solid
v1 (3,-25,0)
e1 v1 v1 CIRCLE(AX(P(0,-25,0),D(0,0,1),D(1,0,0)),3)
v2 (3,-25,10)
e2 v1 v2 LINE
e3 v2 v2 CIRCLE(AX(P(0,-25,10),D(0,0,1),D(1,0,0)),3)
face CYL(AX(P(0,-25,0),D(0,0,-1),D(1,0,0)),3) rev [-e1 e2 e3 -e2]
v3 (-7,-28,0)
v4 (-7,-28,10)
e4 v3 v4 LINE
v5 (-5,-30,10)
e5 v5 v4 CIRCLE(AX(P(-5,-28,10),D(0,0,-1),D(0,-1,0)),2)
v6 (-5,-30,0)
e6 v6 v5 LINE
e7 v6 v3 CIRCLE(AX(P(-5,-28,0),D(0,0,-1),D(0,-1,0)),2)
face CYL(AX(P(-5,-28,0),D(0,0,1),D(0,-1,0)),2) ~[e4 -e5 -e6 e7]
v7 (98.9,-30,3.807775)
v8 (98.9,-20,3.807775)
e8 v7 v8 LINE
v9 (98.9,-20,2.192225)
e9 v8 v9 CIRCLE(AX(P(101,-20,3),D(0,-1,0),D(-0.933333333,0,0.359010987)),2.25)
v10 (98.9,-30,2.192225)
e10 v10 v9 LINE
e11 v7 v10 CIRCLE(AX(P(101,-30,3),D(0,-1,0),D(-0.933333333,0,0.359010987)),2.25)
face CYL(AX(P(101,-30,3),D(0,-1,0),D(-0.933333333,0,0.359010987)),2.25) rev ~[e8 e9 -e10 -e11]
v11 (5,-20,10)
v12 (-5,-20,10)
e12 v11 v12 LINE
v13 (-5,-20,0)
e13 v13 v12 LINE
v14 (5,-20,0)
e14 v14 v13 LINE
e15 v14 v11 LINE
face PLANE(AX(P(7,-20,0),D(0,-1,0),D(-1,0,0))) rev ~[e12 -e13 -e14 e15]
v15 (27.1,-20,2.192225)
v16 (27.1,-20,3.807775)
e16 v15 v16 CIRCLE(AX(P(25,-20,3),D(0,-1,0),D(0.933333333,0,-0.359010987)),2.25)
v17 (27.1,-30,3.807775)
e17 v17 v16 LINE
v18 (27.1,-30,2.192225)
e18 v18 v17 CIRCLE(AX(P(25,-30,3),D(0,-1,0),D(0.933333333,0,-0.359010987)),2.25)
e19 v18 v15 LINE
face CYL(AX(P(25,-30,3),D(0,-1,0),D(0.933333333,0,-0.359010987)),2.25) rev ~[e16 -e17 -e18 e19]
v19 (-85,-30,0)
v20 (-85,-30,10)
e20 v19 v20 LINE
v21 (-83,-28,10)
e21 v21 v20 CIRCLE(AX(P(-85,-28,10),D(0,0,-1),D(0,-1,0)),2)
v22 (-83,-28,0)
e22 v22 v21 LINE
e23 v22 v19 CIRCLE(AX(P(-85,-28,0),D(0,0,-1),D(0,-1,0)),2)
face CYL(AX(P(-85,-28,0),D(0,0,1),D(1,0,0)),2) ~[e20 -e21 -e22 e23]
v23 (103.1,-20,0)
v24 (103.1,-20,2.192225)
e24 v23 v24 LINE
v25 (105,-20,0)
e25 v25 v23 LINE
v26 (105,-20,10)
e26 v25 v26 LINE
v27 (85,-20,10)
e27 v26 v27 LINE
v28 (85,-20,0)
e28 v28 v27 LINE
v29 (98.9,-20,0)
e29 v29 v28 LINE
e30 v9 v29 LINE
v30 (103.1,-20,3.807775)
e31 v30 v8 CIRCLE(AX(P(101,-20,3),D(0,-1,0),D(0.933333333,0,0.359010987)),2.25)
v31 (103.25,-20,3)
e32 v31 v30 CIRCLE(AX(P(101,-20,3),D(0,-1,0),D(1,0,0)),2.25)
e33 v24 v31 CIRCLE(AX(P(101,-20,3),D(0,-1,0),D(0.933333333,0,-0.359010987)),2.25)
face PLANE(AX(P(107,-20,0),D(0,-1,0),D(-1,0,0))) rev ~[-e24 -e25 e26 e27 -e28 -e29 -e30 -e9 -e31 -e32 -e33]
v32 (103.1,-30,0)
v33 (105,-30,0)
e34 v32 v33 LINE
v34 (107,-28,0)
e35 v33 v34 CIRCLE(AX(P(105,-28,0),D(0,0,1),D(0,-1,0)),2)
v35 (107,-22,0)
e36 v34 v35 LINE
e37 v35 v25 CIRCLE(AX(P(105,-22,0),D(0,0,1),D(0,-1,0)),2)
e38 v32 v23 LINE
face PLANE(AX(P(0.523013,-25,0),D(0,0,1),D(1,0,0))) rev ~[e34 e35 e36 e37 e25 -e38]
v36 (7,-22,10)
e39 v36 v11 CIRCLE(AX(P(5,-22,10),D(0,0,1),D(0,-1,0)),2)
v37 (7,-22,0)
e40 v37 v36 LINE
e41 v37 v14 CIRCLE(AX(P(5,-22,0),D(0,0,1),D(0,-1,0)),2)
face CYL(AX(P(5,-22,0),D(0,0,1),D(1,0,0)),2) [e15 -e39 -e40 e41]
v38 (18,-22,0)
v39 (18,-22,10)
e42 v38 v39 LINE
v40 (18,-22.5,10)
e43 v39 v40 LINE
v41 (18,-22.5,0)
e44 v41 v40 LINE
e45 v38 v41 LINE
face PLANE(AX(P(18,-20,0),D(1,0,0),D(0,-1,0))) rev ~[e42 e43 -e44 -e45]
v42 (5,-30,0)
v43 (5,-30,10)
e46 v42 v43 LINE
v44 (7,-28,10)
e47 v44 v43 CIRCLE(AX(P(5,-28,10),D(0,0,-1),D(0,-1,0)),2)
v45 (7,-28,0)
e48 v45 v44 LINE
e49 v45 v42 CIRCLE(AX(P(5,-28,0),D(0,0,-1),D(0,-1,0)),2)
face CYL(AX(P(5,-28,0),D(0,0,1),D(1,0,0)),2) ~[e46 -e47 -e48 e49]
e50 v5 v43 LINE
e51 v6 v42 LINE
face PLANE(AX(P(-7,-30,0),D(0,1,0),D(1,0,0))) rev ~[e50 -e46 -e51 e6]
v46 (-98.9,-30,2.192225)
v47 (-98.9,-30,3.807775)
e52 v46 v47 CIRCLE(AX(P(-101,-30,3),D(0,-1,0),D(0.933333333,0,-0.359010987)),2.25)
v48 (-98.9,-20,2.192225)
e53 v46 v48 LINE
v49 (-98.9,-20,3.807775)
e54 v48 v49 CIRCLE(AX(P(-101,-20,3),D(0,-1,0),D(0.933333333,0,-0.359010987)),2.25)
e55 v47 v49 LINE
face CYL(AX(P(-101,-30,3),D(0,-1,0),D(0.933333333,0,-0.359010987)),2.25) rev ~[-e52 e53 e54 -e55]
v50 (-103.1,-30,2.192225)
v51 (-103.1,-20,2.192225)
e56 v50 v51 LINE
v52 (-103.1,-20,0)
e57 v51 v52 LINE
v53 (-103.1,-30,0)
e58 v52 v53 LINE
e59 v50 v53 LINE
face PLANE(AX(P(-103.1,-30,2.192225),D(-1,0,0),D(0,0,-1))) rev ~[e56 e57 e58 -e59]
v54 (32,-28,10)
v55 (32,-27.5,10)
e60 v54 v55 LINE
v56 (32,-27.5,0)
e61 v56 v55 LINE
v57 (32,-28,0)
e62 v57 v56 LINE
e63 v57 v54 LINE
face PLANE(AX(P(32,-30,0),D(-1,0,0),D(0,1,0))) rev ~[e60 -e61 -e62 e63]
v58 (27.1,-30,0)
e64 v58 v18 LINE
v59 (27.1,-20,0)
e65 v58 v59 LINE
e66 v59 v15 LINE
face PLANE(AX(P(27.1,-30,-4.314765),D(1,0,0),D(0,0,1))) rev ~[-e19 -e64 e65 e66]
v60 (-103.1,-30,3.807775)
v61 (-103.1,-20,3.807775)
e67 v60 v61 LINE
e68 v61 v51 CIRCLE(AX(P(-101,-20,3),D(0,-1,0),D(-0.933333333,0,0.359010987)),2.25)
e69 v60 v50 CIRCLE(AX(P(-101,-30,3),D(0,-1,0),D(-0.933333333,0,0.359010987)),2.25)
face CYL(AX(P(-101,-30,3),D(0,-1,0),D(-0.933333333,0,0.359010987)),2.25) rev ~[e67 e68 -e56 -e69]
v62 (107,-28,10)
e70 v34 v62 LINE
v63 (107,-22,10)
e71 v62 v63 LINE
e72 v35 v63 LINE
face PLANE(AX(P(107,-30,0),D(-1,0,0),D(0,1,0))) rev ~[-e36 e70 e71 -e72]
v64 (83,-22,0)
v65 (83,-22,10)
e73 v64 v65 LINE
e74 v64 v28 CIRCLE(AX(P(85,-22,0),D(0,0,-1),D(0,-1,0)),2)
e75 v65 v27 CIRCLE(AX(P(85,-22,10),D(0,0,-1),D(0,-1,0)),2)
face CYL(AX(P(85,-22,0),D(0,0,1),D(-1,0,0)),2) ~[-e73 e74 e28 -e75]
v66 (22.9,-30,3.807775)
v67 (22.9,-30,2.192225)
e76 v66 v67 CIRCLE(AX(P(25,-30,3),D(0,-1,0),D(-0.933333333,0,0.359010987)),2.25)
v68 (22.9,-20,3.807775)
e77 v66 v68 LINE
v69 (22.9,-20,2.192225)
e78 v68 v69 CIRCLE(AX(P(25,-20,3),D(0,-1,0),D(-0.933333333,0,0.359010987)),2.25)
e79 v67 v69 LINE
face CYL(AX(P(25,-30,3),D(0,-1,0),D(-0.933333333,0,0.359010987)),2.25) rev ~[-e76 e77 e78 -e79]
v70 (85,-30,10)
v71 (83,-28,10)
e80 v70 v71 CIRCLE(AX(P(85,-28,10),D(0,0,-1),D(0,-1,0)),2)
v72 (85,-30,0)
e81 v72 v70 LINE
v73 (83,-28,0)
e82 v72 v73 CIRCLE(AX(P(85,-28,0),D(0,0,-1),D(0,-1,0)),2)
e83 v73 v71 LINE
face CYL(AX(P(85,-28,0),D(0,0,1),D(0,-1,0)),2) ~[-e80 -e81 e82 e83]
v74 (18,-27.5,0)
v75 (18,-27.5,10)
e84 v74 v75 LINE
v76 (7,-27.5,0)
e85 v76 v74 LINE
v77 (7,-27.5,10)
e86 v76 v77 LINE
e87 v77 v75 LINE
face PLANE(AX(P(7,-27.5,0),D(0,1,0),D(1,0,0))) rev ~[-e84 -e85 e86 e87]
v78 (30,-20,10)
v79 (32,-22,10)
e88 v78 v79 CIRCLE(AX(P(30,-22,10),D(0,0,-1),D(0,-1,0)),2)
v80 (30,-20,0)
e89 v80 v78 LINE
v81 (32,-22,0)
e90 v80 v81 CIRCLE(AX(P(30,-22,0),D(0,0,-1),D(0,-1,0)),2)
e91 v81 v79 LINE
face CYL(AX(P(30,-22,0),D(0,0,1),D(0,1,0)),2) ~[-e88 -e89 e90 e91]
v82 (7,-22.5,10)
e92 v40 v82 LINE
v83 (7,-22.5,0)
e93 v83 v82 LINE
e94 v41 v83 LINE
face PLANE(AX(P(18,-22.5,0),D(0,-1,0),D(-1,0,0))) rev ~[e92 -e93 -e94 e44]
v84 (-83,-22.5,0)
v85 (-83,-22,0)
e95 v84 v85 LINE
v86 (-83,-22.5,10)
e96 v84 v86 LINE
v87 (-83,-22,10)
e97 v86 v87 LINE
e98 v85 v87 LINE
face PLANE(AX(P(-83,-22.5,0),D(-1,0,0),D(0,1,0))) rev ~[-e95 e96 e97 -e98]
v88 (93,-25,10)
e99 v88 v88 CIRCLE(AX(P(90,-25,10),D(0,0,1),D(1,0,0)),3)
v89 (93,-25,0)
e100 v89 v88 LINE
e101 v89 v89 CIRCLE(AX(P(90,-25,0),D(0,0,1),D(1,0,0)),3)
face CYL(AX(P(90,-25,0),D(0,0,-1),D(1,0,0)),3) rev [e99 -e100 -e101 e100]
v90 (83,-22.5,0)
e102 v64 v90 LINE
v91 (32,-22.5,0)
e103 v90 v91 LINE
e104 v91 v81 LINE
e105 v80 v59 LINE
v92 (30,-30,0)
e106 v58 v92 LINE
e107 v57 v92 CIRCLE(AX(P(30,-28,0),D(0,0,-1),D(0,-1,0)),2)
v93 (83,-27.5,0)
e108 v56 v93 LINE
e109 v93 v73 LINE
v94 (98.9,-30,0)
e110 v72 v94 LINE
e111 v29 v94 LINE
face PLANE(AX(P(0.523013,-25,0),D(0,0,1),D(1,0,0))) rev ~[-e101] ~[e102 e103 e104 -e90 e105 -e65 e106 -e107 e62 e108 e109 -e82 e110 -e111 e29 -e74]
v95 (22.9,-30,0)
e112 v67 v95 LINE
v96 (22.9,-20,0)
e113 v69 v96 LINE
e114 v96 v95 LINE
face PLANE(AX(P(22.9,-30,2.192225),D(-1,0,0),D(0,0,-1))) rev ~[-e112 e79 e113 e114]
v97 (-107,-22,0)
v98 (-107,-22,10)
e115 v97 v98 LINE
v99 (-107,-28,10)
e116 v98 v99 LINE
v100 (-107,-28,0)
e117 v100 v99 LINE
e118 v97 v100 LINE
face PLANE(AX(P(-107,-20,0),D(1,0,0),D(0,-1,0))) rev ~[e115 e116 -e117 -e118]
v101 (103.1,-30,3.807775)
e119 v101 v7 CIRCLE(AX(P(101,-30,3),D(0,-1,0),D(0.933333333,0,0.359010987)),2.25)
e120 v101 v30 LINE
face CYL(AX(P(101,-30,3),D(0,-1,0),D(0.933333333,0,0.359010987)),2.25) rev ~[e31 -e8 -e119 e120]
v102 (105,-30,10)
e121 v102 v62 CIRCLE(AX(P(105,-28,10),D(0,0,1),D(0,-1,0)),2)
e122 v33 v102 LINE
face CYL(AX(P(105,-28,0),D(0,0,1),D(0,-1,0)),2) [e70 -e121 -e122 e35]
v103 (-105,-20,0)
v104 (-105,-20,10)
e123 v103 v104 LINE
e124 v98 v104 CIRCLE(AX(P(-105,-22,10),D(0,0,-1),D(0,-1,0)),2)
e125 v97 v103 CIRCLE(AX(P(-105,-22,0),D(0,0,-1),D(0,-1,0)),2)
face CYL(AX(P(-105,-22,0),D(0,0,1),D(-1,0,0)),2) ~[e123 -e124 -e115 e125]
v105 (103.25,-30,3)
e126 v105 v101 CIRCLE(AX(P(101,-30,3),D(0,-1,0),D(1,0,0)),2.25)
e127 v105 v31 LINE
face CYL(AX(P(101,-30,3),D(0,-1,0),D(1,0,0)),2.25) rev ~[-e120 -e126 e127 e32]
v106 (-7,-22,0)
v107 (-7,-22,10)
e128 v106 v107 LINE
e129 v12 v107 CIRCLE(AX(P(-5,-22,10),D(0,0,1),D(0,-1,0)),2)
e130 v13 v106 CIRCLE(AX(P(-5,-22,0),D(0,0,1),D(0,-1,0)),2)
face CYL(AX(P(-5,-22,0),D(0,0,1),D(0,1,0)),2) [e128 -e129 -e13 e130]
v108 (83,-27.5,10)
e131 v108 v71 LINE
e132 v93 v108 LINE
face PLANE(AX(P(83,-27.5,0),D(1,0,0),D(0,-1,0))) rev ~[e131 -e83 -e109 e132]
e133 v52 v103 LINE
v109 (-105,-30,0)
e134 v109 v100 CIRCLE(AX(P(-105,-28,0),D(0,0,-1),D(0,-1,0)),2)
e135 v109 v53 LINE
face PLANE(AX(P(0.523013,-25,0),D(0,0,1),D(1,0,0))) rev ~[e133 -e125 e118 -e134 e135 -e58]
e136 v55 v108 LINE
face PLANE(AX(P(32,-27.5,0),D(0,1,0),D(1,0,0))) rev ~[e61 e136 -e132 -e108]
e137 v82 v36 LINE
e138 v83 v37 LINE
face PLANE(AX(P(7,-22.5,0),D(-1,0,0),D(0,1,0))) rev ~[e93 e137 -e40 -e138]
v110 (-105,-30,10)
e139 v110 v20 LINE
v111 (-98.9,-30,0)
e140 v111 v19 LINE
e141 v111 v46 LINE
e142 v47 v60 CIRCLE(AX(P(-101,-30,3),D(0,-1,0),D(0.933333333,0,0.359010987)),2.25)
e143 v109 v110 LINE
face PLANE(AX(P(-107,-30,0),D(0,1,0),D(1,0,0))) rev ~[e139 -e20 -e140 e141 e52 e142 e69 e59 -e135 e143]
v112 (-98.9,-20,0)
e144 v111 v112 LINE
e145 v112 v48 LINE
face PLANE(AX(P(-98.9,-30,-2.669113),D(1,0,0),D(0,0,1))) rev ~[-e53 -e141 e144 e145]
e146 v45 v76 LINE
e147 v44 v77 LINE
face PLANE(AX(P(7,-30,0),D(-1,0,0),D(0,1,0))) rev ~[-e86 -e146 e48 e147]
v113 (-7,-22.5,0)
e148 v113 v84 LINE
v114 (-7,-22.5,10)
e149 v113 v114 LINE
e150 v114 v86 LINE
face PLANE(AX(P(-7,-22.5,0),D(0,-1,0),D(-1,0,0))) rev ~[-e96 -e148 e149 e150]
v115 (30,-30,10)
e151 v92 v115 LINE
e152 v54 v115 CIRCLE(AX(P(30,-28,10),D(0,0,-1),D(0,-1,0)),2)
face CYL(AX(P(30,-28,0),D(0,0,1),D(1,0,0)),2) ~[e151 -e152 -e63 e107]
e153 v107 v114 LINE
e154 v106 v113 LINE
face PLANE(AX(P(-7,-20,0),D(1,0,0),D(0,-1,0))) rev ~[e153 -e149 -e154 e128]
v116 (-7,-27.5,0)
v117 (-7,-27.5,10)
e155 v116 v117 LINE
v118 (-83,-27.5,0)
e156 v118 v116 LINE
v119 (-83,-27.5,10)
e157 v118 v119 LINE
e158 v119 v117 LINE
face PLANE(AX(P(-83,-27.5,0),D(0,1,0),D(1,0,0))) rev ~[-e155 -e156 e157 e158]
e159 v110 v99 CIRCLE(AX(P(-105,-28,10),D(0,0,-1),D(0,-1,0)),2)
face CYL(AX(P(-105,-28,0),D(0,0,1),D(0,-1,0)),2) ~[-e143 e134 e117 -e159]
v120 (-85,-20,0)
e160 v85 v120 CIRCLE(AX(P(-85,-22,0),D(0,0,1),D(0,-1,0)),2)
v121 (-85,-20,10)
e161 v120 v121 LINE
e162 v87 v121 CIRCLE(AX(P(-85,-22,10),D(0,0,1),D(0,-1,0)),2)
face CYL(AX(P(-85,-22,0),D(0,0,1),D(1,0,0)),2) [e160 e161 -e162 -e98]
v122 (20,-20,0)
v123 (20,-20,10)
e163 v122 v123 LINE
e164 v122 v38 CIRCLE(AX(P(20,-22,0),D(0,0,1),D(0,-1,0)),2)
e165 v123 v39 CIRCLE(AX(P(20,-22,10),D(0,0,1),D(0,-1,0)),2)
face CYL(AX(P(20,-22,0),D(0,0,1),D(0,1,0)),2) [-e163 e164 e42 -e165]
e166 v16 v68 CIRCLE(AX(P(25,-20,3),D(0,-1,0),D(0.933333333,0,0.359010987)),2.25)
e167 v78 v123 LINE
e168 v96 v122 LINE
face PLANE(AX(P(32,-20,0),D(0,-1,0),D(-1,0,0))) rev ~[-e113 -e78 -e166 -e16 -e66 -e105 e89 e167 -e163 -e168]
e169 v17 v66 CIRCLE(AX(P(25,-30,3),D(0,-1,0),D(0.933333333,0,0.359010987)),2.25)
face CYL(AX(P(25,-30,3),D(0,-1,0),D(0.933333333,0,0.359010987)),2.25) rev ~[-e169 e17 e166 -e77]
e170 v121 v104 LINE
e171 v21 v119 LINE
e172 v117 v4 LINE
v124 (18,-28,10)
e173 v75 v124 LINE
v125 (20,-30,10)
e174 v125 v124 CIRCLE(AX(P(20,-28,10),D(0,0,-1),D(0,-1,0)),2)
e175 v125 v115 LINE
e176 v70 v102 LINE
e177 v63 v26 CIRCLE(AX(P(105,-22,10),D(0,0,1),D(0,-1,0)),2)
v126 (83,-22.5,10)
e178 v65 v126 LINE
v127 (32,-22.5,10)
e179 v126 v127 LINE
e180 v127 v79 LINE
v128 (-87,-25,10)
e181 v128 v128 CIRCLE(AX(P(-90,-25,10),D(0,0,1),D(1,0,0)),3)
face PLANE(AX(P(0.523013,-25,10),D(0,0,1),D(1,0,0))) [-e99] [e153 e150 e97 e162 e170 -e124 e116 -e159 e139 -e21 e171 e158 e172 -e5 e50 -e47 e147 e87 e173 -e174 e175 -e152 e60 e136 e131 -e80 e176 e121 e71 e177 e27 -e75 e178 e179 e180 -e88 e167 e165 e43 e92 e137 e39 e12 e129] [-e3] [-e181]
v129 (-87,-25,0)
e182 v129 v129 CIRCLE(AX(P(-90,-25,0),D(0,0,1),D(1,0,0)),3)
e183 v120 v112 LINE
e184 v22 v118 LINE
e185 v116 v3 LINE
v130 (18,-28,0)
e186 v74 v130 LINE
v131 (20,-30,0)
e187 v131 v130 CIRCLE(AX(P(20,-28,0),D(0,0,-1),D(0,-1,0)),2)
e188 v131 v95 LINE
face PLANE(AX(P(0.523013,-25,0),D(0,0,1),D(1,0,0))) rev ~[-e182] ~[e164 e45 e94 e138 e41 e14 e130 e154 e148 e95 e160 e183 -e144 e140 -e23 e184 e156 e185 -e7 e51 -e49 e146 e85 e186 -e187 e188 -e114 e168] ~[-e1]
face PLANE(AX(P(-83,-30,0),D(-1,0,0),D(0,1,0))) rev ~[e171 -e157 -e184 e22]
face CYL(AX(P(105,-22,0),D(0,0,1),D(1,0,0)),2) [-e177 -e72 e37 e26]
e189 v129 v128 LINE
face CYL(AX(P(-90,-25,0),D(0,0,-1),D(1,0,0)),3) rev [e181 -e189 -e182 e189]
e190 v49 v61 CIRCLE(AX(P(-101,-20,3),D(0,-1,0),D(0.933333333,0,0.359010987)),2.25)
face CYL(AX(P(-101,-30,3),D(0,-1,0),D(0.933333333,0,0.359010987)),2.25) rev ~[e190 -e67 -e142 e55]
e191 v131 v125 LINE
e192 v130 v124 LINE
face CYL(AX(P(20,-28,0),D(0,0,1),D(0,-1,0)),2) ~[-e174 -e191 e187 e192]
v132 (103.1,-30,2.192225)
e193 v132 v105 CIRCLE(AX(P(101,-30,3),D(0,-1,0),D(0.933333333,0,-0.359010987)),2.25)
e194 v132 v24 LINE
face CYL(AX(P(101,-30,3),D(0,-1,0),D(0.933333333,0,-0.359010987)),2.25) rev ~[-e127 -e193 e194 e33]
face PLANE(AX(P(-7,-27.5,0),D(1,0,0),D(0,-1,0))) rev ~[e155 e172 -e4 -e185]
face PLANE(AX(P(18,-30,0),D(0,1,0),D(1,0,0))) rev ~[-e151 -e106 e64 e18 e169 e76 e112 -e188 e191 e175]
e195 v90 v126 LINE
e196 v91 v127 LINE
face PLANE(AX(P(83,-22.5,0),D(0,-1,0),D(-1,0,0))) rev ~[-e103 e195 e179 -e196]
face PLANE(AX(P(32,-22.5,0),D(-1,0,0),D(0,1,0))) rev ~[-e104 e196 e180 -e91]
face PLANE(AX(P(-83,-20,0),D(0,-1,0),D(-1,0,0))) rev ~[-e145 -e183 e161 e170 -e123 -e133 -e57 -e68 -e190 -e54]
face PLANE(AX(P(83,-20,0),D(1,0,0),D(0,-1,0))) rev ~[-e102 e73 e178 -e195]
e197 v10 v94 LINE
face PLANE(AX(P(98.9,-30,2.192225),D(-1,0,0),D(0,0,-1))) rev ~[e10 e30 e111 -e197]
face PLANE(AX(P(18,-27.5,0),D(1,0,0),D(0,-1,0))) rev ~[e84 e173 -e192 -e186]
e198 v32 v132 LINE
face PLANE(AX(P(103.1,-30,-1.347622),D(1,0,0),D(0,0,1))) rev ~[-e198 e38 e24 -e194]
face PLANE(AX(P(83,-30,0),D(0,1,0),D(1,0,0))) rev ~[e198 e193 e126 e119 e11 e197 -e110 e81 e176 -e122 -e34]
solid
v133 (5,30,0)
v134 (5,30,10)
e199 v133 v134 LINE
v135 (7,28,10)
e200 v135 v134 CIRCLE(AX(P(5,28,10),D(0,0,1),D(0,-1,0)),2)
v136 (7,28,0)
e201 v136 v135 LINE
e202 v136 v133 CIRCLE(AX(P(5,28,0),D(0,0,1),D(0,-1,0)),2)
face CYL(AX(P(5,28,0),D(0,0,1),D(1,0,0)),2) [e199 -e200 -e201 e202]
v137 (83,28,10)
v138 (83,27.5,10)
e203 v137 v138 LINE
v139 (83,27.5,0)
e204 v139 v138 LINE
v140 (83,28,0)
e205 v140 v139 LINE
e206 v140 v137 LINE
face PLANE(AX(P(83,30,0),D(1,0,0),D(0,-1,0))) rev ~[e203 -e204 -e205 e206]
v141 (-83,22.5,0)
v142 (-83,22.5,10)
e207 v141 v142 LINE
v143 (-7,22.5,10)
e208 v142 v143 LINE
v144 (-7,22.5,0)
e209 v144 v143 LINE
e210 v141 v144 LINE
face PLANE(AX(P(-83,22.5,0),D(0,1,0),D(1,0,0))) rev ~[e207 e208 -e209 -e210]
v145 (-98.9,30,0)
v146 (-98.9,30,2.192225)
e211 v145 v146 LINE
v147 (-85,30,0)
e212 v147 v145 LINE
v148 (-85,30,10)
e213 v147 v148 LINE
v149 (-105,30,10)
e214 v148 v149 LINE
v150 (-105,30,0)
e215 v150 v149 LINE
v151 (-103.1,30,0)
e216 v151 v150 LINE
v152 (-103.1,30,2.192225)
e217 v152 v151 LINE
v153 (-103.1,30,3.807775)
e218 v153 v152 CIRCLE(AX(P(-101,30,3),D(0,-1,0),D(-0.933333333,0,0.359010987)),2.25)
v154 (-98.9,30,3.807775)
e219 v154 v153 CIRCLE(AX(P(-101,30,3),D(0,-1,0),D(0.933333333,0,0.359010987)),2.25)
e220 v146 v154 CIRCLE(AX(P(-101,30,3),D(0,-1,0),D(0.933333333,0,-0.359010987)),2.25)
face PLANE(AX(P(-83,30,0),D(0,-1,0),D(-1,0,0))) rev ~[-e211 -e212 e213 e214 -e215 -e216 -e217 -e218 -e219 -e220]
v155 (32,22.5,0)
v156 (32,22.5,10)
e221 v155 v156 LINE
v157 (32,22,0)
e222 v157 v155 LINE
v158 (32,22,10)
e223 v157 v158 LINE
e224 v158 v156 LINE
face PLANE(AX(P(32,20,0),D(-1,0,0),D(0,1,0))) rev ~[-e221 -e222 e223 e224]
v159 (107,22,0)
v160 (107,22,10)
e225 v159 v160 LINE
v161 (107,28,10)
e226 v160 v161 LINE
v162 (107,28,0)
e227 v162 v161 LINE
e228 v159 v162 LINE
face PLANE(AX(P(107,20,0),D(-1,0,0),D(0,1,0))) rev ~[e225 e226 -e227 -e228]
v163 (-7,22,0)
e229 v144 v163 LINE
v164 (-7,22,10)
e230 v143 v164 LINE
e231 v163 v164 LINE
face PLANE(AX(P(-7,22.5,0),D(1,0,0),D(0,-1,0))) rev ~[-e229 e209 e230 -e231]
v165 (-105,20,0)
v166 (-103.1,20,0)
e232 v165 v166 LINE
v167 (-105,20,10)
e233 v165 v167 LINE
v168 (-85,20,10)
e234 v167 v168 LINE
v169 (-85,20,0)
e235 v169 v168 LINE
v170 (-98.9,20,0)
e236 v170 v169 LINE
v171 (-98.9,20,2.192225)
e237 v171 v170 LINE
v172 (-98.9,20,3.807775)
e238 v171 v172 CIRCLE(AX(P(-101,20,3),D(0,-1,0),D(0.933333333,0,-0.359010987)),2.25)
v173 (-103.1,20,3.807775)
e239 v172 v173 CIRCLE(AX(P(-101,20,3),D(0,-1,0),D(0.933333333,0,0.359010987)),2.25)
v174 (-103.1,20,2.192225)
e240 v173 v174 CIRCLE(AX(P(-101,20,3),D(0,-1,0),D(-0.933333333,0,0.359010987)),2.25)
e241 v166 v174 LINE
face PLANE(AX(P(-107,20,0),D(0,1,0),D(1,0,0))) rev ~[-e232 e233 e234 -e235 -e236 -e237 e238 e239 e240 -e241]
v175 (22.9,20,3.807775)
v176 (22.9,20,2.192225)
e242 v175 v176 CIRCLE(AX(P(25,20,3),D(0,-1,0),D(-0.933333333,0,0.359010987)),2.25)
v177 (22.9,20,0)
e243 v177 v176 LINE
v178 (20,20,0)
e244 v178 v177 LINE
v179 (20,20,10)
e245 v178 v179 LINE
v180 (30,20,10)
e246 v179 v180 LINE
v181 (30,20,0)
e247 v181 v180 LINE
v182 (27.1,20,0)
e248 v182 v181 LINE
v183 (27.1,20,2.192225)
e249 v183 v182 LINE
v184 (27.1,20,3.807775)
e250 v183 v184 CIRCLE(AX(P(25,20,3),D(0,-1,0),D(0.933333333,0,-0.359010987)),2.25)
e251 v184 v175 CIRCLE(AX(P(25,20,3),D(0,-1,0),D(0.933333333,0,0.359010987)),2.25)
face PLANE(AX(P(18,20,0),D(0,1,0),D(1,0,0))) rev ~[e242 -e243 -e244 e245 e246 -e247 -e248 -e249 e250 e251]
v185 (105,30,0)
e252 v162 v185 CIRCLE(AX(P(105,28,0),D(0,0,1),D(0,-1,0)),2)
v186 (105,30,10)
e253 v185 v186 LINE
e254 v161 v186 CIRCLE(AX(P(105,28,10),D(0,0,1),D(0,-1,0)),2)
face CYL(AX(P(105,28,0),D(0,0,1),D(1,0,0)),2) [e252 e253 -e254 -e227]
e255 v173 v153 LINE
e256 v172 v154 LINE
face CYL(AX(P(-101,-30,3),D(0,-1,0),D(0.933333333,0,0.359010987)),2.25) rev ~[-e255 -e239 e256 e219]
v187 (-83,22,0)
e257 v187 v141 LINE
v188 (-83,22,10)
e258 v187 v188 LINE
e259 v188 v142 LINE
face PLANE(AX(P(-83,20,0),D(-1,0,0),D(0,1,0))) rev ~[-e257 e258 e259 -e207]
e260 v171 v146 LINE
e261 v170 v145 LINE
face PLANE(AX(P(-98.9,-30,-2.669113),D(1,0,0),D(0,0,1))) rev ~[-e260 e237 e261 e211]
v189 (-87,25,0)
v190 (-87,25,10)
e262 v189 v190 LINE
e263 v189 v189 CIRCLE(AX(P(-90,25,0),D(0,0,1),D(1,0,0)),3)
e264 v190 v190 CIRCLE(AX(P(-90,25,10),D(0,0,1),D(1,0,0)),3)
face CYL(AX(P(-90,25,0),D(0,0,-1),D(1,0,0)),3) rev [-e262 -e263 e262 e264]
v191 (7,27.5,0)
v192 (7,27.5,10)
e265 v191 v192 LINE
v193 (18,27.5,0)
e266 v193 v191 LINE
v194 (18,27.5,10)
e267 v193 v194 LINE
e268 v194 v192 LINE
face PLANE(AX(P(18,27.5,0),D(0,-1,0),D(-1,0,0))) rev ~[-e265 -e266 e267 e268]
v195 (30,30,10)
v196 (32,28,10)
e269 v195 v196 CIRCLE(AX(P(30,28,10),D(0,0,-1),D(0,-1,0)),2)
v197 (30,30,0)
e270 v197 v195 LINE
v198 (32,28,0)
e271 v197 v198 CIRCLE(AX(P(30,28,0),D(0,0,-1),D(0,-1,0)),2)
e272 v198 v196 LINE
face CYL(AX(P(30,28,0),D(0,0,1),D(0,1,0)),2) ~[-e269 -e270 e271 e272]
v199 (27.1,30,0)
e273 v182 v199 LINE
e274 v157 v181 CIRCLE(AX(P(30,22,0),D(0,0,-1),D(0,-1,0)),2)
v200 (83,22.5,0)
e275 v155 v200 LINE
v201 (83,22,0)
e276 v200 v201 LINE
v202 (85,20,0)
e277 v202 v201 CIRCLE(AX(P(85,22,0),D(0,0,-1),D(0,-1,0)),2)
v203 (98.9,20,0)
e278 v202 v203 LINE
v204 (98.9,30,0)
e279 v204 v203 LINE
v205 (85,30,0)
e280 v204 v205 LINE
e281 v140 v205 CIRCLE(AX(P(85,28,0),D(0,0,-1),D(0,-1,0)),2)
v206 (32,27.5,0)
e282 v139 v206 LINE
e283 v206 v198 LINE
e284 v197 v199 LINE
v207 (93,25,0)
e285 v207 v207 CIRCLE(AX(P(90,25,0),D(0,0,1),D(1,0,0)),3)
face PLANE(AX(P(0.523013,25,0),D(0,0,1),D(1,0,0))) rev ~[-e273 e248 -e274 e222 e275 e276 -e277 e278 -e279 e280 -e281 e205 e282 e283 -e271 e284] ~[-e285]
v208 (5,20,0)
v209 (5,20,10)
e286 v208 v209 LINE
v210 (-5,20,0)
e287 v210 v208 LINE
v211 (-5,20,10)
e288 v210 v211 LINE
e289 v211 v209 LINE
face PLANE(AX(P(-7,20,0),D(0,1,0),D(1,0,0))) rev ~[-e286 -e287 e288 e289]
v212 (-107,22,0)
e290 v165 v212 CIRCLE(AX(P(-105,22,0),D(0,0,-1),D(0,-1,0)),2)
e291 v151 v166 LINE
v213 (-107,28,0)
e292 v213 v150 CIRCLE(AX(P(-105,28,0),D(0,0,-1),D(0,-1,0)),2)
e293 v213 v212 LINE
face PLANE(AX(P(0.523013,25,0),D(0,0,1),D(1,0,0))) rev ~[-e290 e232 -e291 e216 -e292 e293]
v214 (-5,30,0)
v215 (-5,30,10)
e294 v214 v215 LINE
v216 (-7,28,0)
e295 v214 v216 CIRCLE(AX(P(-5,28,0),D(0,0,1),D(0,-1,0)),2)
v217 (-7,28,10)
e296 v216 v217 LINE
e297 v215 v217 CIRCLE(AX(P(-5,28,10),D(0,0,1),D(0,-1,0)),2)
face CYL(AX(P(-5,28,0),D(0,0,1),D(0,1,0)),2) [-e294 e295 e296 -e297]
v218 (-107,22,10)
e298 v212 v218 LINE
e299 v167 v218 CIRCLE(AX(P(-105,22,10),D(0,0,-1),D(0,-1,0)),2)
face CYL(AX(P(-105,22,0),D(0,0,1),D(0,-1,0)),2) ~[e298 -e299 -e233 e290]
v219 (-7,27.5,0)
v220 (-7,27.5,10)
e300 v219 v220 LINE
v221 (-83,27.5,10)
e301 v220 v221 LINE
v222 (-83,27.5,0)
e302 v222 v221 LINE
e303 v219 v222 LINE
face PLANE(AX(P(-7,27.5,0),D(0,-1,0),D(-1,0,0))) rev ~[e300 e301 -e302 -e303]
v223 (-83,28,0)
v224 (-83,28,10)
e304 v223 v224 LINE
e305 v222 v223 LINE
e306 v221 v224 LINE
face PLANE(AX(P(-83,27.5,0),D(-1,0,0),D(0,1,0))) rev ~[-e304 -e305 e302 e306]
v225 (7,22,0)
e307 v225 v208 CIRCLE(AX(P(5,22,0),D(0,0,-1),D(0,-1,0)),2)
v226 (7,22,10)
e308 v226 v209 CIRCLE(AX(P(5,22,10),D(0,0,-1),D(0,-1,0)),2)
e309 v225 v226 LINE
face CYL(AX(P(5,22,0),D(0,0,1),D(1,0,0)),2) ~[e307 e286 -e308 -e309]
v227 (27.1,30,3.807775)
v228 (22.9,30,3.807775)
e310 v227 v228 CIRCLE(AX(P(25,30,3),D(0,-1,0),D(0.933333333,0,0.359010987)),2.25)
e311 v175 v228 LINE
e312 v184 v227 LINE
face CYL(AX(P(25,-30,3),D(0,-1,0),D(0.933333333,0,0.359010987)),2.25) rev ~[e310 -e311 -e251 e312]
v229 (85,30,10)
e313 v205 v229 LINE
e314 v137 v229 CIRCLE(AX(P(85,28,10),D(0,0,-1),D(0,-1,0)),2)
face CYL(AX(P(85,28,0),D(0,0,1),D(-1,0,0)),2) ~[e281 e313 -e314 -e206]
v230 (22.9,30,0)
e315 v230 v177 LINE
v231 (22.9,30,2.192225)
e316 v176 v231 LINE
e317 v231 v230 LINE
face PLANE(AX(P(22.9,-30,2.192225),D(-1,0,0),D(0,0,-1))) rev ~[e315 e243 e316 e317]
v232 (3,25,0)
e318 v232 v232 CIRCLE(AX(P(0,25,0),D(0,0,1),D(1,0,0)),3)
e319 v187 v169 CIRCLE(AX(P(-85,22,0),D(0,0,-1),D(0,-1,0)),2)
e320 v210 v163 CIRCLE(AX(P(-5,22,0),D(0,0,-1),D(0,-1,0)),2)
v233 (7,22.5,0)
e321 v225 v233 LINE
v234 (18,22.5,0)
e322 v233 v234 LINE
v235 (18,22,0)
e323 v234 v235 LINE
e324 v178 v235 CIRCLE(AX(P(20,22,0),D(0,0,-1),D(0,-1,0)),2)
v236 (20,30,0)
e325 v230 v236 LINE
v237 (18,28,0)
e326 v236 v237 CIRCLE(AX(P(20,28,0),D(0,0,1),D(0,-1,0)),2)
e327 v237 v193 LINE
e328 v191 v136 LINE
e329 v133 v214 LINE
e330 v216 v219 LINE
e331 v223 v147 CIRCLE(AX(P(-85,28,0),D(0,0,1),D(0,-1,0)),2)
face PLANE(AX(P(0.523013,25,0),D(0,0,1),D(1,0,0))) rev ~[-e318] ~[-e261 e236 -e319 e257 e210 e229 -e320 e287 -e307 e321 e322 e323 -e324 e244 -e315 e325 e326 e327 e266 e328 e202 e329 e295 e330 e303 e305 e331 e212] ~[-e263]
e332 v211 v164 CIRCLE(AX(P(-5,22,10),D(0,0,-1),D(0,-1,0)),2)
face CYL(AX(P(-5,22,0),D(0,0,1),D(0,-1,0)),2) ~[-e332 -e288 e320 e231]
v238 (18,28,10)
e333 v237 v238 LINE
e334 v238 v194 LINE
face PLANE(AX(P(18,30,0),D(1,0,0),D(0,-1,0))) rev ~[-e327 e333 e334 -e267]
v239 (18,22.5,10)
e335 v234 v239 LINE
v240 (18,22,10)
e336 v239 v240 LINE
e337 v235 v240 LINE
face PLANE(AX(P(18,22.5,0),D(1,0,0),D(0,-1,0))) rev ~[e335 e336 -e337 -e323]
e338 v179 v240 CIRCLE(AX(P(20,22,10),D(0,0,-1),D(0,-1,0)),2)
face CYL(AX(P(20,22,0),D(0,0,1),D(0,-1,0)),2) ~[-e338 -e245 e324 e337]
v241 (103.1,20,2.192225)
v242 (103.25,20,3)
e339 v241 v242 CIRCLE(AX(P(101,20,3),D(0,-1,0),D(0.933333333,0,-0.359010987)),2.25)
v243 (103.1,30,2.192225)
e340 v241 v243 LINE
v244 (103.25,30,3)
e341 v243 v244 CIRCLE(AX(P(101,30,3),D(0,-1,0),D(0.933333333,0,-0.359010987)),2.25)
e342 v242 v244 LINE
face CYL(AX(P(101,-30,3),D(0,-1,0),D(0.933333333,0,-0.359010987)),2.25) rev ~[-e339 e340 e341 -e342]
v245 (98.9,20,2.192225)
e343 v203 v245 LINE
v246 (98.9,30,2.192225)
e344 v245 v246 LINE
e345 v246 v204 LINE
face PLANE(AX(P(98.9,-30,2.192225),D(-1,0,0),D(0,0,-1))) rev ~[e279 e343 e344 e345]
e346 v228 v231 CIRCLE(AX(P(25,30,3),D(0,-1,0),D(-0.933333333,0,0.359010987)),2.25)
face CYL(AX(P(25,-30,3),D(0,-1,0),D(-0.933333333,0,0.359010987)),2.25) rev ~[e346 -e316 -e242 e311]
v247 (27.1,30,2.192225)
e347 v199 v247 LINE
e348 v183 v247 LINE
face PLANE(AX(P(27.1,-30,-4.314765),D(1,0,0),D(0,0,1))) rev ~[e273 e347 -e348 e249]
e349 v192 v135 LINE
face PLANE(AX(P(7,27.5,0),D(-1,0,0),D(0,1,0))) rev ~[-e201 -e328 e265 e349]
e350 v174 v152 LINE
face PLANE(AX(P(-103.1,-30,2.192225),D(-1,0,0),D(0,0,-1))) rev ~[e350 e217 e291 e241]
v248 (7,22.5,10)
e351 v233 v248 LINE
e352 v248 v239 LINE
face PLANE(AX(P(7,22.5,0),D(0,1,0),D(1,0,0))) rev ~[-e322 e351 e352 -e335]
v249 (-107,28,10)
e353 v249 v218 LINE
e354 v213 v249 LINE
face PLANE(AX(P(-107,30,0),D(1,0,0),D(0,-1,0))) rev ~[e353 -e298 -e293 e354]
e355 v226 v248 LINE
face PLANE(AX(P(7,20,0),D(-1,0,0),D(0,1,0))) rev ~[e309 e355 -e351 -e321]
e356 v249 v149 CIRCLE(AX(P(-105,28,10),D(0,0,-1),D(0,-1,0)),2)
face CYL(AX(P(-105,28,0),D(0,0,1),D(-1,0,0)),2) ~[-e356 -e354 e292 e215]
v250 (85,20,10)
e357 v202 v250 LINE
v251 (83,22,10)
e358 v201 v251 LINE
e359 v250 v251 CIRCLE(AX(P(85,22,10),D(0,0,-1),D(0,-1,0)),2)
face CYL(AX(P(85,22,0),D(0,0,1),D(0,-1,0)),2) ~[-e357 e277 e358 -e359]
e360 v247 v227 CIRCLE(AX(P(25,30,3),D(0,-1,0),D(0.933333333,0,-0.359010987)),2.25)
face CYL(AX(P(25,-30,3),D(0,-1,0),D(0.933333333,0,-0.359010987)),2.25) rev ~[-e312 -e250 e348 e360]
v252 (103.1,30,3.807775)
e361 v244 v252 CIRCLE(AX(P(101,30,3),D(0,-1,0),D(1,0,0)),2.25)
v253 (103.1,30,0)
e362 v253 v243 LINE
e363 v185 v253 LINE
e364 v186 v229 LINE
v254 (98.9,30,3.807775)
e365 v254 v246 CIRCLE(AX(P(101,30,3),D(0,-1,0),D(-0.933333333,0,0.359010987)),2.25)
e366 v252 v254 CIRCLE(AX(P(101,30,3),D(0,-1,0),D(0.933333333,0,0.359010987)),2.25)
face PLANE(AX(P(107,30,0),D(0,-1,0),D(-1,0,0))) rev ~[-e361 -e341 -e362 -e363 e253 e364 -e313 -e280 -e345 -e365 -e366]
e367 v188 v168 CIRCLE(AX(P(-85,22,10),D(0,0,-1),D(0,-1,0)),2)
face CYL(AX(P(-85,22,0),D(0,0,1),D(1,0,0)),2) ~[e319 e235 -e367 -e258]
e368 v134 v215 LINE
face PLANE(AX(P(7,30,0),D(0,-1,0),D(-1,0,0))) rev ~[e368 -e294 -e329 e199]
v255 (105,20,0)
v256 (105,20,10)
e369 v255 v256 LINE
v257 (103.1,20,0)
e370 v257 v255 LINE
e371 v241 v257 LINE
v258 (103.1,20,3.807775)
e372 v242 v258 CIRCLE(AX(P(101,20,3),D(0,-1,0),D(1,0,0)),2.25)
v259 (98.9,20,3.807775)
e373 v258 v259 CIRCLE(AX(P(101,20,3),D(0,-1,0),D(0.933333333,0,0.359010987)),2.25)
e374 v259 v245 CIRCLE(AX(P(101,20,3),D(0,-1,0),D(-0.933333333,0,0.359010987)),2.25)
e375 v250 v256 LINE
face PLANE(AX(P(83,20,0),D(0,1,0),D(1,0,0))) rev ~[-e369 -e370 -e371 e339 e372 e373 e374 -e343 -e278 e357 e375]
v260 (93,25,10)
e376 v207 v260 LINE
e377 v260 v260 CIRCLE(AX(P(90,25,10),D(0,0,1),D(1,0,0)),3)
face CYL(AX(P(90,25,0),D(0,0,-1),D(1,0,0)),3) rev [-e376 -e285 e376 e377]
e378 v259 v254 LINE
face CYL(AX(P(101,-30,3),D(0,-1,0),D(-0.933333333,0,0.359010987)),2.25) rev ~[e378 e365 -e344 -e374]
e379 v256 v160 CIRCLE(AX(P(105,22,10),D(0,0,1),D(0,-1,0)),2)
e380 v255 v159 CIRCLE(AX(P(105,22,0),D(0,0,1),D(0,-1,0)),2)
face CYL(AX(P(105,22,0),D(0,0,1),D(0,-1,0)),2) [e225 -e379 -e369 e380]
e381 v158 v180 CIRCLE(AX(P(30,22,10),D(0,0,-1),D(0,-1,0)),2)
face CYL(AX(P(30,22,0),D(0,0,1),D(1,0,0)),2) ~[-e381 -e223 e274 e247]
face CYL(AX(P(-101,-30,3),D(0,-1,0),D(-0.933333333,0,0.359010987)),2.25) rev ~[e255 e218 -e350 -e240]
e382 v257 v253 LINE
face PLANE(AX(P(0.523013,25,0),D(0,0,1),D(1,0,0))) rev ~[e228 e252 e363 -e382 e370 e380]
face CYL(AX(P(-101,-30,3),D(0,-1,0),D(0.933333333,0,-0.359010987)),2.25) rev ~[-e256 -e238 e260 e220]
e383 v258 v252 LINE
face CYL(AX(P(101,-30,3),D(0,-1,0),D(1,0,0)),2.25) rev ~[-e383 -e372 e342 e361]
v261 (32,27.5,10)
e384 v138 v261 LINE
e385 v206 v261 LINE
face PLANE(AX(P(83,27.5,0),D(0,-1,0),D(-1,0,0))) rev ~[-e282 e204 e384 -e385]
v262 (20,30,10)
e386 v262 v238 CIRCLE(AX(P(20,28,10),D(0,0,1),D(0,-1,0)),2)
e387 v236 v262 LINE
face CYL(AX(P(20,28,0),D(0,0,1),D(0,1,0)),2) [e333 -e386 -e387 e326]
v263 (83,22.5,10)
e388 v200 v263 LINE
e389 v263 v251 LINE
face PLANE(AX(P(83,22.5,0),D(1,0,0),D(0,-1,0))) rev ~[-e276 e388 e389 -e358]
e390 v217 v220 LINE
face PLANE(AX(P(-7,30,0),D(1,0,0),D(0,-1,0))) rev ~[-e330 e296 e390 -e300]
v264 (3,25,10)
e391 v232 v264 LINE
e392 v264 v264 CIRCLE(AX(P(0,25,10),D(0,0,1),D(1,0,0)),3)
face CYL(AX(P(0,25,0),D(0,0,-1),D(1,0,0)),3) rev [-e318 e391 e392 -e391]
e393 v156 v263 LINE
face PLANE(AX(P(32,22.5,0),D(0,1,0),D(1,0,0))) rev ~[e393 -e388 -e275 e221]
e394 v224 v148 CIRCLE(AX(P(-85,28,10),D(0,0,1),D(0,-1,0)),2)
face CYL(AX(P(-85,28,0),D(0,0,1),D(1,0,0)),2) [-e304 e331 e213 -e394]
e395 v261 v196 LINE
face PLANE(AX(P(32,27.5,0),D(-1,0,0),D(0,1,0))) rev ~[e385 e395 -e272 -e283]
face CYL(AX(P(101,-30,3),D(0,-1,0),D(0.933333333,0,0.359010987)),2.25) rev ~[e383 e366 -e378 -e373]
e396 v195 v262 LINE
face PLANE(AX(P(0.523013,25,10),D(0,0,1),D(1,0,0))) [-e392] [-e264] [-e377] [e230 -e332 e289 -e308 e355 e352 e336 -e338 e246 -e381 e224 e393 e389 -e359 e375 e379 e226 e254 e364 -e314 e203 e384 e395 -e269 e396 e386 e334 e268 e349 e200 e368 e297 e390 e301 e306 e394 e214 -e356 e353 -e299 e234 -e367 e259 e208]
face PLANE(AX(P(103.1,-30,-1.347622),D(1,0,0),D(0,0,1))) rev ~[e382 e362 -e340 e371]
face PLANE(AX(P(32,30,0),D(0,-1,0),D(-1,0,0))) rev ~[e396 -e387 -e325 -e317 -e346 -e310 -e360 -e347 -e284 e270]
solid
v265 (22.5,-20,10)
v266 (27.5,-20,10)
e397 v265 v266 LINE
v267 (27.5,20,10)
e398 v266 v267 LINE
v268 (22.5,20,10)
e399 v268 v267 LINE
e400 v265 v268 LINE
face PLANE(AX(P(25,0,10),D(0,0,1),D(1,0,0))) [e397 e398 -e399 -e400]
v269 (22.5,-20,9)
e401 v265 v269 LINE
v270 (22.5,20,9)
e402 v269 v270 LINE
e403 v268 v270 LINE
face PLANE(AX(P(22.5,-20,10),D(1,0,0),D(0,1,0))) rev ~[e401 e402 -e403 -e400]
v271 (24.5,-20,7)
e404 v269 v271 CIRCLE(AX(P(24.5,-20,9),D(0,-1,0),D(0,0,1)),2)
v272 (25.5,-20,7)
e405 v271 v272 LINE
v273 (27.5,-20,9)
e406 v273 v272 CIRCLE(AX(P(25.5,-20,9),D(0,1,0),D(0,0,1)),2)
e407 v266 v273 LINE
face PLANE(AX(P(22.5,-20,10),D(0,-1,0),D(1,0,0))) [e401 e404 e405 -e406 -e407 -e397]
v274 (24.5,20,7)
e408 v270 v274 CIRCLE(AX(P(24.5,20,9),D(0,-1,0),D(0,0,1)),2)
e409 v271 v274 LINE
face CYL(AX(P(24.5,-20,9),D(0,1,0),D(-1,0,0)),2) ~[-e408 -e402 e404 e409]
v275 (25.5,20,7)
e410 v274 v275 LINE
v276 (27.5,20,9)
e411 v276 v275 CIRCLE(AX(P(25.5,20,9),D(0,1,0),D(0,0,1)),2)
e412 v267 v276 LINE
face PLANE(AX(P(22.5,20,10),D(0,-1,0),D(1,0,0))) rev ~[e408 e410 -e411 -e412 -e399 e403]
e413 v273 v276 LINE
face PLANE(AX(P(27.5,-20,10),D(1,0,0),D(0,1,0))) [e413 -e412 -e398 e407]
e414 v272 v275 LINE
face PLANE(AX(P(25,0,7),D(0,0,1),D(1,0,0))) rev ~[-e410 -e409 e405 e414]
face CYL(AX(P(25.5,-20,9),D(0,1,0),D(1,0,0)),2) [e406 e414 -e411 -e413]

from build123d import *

# Parameters (mm, degrees)
F0_R     = 3
F1_DEPTH = 10
F3_DEPTH = 70
F4_R     = 2
F4_2_R   = 2
F5_W     = 5
F5_H     = 40
F6_DEPTH = 3
F7_R     = 2


with BuildPart() as f1:
    # F0 (on Top) → F1 (new body)
    with BuildSketch(Plane.XY):
        Polygon((83, 20), (107, 20), (107, 30), (83, 30), (83, 27.5), (32, 27.5), (32, 30), (18, 30), (18, 27.5), (7, 27.5), (7, 30), (-7, 30), (-7, 27.5), (-83, 27.5), (-83, 30), (-107, 30), (-107, 20), (-83, 20), (-83, 22.5), (-7, 22.5), (-7, 20), (7, 20), (7, 22.5), (18, 22.5), (18, 20), (32, 20), (32, 22.5), (83, 22.5), align=None)
        with Locations((-90, 25)):
            Circle(F0_R, mode=Mode.SUBTRACT)
        with Locations((0, 25)):
            Circle(F0_R, mode=Mode.SUBTRACT)
        with Locations((90, 25)):
            Circle(F0_R, mode=Mode.SUBTRACT)
    extrude(amount=F1_DEPTH)


with BuildPart() as f1b:
    # F0 (on Top) → F1, piece 2 (new body)
    with BuildSketch(Plane.XY):
        Polygon((83, -30), (107, -30), (107, -20), (83, -20), (83, -22.5), (32, -22.5), (32, -20), (18, -20), (18, -22.5), (7, -22.5), (7, -20), (-7, -20), (-7, -22.5), (-83, -22.5), (-83, -20), (-107, -20), (-107, -30), (-83, -30), (-83, -27.5), (-7, -27.5), (-7, -30), (7, -30), (7, -27.5), (18, -27.5), (18, -30), (32, -30), (32, -27.5), (83, -27.5), align=None)
        with Locations((-90, -25)):
            Circle(F0_R, mode=Mode.SUBTRACT)
        with Locations((0, -25)):
            Circle(F0_R, mode=Mode.SUBTRACT)
        with Locations((90, -25)):
            Circle(F0_R, mode=Mode.SUBTRACT)
    extrude(amount=F1_DEPTH)


with BuildPart() as f3_tool:
    # F2 (on face) → F3 (new body)
    with BuildSketch(Plane.XZ.offset(30)):
        with BuildLine():
            ThreePointArc((103.1, 2.1922252789), (103.2121821806, 2.5892080819), (103.25, 3))
            ThreePointArc((103.25, 3), (103.2121821806, 3.4107919181), (103.1, 3.8077747211))
            ThreePointArc((103.1, 3.8077747211), (101, 5.25), (98.9, 3.8077747211))
            ThreePointArc((98.9, 3.8077747211), (98.75, 3), (98.9, 2.1922252789))
            ThreePointArc((98.9, 2.1922252789), (101, 0.75), (103.1, 2.1922252789))
        make_face()
        with BuildLine():
            Line((103.1, -1.3476219028), (103.1, 2.1922252789))
            ThreePointArc((103.1, 2.1922252789), (101, 0.75), (98.9, 2.1922252789))
            Line((98.9, 2.1922252789), (98.9, -1.3476219028))
            Line((98.9, -1.3476219028), (103.1, -1.3476219028))
        make_face()
        with BuildLine():
            Line((-103.1, 2.1922252789), (-103.1, 0.0061060628))
            Line((-103.1, 0.0061060628), (-103.1, -2.6691132225))
            Line((-103.1, -2.6691132225), (-98.9, -2.6691132225))
            Line((-98.9, -2.6691132225), (-98.9, -0.0081721373))
            Line((-98.9, -0.0081721373), (-98.9, 2.1922252789))
            ThreePointArc((-98.9, 2.1922252789), (-101, 0.75), (-103.1, 2.1922252789))
        make_face()
        with BuildLine():
            ThreePointArc((-103.1, 3.8077747211), (-103.25, 3), (-103.1, 2.1922252789))
            ThreePointArc((-103.1, 2.1922252789), (-101, 0.75), (-98.9, 2.1922252789))
            ThreePointArc((-98.9, 2.1922252789), (-98.75, 3), (-98.9, 3.8077747211))
            ThreePointArc((-98.9, 3.8077747211), (-101, 5.25), (-103.1, 3.8077747211))
        make_face()
        with BuildLine():
            Line((22.9, 2.1922252789), (22.9, -4.3147648685))
            Line((22.9, -4.3147648685), (27.1, -4.3147648685))
            Line((27.1, -4.3147648685), (27.1, 2.1922252789))
            ThreePointArc((27.1, 2.1922252789), (25, 0.75), (22.9, 2.1922252789))
        make_face()
        with BuildLine():
            ThreePointArc((22.9, 3.8077747211), (22.75, 3), (22.9, 2.1922252789))
            ThreePointArc((22.9, 2.1922252789), (25, 0.75), (27.1, 2.1922252789))
            ThreePointArc((27.1, 2.1922252789), (27.25, 3), (27.1, 3.8077747211))
            ThreePointArc((27.1, 3.8077747211), (25, 5.25), (22.9, 3.8077747211))
        make_face()
    extrude(amount=-F3_DEPTH)


with BuildPart() as f1_1:
    add(f1.part)

    # F3: cut by f3_tool
    add(f3_tool.part, mode=Mode.SUBTRACT)

    # F4
    f4_edges = [f1_1.edges().sort_by_distance(p)[0] for p in [
        (-107, 20, 5),
        (-107, 30, 5),
        (-7, 20, 5),
        (-7, 30, 5),
        (18, 20, 5),
        (18, 30, 5),
        (83, 20, 5),
        (83, 30, 5),
        (-83, 20, 5),
        (-83, 30, 5),
        (7, 20, 5),
        (7, 30, 5),
        (32, 30, 5),
        (32, 20, 5),
        (107, 20, 5),
        (107, 30, 5),
    ]]
    fillet(f4_edges, radius=F4_R)


with BuildPart() as f1b_1:
    add(f1b.part)

    # F3: cut by f3_tool
    add(f3_tool.part, mode=Mode.SUBTRACT)

    # F4#2
    f4_2_edges = [f1b_1.edges().sort_by_distance(p)[0] for p in [
        (-83, -30, 5),
        (-83, -20, 5),
        (-107, -30, 5),
        (-107, -20, 5),
        (-7, -20, 5),
        (18, -20, 5),
        (-7, -30, 5),
        (18, -30, 5),
        (83, -20, 5),
        (83, -30, 5),
        (107, -30, 5),
        (107, -20, 5),
        (32, -20, 5),
        (32, -30, 5),
        (7, -30, 5),
        (7, -20, 5),
    ]]
    fillet(f4_2_edges, radius=F4_2_R)


with BuildPart() as f6:
    # F5 (on face) → F6 (new body)
    with BuildSketch(Plane.XY.offset(10)):
        with Locations((25, 0)):
            Rectangle(F5_W, F5_H)
    extrude(amount=-F6_DEPTH)

    # F7
    f7_edges = [f6.edges().sort_by_distance(p)[0] for p in [
        (27.5, 0, 7),
        (22.5, 0, 7),
    ]]
    fillet(f7_edges, radius=F7_R)


solid = Compound([f1_1.part, f1b_1.part, f6.part])
